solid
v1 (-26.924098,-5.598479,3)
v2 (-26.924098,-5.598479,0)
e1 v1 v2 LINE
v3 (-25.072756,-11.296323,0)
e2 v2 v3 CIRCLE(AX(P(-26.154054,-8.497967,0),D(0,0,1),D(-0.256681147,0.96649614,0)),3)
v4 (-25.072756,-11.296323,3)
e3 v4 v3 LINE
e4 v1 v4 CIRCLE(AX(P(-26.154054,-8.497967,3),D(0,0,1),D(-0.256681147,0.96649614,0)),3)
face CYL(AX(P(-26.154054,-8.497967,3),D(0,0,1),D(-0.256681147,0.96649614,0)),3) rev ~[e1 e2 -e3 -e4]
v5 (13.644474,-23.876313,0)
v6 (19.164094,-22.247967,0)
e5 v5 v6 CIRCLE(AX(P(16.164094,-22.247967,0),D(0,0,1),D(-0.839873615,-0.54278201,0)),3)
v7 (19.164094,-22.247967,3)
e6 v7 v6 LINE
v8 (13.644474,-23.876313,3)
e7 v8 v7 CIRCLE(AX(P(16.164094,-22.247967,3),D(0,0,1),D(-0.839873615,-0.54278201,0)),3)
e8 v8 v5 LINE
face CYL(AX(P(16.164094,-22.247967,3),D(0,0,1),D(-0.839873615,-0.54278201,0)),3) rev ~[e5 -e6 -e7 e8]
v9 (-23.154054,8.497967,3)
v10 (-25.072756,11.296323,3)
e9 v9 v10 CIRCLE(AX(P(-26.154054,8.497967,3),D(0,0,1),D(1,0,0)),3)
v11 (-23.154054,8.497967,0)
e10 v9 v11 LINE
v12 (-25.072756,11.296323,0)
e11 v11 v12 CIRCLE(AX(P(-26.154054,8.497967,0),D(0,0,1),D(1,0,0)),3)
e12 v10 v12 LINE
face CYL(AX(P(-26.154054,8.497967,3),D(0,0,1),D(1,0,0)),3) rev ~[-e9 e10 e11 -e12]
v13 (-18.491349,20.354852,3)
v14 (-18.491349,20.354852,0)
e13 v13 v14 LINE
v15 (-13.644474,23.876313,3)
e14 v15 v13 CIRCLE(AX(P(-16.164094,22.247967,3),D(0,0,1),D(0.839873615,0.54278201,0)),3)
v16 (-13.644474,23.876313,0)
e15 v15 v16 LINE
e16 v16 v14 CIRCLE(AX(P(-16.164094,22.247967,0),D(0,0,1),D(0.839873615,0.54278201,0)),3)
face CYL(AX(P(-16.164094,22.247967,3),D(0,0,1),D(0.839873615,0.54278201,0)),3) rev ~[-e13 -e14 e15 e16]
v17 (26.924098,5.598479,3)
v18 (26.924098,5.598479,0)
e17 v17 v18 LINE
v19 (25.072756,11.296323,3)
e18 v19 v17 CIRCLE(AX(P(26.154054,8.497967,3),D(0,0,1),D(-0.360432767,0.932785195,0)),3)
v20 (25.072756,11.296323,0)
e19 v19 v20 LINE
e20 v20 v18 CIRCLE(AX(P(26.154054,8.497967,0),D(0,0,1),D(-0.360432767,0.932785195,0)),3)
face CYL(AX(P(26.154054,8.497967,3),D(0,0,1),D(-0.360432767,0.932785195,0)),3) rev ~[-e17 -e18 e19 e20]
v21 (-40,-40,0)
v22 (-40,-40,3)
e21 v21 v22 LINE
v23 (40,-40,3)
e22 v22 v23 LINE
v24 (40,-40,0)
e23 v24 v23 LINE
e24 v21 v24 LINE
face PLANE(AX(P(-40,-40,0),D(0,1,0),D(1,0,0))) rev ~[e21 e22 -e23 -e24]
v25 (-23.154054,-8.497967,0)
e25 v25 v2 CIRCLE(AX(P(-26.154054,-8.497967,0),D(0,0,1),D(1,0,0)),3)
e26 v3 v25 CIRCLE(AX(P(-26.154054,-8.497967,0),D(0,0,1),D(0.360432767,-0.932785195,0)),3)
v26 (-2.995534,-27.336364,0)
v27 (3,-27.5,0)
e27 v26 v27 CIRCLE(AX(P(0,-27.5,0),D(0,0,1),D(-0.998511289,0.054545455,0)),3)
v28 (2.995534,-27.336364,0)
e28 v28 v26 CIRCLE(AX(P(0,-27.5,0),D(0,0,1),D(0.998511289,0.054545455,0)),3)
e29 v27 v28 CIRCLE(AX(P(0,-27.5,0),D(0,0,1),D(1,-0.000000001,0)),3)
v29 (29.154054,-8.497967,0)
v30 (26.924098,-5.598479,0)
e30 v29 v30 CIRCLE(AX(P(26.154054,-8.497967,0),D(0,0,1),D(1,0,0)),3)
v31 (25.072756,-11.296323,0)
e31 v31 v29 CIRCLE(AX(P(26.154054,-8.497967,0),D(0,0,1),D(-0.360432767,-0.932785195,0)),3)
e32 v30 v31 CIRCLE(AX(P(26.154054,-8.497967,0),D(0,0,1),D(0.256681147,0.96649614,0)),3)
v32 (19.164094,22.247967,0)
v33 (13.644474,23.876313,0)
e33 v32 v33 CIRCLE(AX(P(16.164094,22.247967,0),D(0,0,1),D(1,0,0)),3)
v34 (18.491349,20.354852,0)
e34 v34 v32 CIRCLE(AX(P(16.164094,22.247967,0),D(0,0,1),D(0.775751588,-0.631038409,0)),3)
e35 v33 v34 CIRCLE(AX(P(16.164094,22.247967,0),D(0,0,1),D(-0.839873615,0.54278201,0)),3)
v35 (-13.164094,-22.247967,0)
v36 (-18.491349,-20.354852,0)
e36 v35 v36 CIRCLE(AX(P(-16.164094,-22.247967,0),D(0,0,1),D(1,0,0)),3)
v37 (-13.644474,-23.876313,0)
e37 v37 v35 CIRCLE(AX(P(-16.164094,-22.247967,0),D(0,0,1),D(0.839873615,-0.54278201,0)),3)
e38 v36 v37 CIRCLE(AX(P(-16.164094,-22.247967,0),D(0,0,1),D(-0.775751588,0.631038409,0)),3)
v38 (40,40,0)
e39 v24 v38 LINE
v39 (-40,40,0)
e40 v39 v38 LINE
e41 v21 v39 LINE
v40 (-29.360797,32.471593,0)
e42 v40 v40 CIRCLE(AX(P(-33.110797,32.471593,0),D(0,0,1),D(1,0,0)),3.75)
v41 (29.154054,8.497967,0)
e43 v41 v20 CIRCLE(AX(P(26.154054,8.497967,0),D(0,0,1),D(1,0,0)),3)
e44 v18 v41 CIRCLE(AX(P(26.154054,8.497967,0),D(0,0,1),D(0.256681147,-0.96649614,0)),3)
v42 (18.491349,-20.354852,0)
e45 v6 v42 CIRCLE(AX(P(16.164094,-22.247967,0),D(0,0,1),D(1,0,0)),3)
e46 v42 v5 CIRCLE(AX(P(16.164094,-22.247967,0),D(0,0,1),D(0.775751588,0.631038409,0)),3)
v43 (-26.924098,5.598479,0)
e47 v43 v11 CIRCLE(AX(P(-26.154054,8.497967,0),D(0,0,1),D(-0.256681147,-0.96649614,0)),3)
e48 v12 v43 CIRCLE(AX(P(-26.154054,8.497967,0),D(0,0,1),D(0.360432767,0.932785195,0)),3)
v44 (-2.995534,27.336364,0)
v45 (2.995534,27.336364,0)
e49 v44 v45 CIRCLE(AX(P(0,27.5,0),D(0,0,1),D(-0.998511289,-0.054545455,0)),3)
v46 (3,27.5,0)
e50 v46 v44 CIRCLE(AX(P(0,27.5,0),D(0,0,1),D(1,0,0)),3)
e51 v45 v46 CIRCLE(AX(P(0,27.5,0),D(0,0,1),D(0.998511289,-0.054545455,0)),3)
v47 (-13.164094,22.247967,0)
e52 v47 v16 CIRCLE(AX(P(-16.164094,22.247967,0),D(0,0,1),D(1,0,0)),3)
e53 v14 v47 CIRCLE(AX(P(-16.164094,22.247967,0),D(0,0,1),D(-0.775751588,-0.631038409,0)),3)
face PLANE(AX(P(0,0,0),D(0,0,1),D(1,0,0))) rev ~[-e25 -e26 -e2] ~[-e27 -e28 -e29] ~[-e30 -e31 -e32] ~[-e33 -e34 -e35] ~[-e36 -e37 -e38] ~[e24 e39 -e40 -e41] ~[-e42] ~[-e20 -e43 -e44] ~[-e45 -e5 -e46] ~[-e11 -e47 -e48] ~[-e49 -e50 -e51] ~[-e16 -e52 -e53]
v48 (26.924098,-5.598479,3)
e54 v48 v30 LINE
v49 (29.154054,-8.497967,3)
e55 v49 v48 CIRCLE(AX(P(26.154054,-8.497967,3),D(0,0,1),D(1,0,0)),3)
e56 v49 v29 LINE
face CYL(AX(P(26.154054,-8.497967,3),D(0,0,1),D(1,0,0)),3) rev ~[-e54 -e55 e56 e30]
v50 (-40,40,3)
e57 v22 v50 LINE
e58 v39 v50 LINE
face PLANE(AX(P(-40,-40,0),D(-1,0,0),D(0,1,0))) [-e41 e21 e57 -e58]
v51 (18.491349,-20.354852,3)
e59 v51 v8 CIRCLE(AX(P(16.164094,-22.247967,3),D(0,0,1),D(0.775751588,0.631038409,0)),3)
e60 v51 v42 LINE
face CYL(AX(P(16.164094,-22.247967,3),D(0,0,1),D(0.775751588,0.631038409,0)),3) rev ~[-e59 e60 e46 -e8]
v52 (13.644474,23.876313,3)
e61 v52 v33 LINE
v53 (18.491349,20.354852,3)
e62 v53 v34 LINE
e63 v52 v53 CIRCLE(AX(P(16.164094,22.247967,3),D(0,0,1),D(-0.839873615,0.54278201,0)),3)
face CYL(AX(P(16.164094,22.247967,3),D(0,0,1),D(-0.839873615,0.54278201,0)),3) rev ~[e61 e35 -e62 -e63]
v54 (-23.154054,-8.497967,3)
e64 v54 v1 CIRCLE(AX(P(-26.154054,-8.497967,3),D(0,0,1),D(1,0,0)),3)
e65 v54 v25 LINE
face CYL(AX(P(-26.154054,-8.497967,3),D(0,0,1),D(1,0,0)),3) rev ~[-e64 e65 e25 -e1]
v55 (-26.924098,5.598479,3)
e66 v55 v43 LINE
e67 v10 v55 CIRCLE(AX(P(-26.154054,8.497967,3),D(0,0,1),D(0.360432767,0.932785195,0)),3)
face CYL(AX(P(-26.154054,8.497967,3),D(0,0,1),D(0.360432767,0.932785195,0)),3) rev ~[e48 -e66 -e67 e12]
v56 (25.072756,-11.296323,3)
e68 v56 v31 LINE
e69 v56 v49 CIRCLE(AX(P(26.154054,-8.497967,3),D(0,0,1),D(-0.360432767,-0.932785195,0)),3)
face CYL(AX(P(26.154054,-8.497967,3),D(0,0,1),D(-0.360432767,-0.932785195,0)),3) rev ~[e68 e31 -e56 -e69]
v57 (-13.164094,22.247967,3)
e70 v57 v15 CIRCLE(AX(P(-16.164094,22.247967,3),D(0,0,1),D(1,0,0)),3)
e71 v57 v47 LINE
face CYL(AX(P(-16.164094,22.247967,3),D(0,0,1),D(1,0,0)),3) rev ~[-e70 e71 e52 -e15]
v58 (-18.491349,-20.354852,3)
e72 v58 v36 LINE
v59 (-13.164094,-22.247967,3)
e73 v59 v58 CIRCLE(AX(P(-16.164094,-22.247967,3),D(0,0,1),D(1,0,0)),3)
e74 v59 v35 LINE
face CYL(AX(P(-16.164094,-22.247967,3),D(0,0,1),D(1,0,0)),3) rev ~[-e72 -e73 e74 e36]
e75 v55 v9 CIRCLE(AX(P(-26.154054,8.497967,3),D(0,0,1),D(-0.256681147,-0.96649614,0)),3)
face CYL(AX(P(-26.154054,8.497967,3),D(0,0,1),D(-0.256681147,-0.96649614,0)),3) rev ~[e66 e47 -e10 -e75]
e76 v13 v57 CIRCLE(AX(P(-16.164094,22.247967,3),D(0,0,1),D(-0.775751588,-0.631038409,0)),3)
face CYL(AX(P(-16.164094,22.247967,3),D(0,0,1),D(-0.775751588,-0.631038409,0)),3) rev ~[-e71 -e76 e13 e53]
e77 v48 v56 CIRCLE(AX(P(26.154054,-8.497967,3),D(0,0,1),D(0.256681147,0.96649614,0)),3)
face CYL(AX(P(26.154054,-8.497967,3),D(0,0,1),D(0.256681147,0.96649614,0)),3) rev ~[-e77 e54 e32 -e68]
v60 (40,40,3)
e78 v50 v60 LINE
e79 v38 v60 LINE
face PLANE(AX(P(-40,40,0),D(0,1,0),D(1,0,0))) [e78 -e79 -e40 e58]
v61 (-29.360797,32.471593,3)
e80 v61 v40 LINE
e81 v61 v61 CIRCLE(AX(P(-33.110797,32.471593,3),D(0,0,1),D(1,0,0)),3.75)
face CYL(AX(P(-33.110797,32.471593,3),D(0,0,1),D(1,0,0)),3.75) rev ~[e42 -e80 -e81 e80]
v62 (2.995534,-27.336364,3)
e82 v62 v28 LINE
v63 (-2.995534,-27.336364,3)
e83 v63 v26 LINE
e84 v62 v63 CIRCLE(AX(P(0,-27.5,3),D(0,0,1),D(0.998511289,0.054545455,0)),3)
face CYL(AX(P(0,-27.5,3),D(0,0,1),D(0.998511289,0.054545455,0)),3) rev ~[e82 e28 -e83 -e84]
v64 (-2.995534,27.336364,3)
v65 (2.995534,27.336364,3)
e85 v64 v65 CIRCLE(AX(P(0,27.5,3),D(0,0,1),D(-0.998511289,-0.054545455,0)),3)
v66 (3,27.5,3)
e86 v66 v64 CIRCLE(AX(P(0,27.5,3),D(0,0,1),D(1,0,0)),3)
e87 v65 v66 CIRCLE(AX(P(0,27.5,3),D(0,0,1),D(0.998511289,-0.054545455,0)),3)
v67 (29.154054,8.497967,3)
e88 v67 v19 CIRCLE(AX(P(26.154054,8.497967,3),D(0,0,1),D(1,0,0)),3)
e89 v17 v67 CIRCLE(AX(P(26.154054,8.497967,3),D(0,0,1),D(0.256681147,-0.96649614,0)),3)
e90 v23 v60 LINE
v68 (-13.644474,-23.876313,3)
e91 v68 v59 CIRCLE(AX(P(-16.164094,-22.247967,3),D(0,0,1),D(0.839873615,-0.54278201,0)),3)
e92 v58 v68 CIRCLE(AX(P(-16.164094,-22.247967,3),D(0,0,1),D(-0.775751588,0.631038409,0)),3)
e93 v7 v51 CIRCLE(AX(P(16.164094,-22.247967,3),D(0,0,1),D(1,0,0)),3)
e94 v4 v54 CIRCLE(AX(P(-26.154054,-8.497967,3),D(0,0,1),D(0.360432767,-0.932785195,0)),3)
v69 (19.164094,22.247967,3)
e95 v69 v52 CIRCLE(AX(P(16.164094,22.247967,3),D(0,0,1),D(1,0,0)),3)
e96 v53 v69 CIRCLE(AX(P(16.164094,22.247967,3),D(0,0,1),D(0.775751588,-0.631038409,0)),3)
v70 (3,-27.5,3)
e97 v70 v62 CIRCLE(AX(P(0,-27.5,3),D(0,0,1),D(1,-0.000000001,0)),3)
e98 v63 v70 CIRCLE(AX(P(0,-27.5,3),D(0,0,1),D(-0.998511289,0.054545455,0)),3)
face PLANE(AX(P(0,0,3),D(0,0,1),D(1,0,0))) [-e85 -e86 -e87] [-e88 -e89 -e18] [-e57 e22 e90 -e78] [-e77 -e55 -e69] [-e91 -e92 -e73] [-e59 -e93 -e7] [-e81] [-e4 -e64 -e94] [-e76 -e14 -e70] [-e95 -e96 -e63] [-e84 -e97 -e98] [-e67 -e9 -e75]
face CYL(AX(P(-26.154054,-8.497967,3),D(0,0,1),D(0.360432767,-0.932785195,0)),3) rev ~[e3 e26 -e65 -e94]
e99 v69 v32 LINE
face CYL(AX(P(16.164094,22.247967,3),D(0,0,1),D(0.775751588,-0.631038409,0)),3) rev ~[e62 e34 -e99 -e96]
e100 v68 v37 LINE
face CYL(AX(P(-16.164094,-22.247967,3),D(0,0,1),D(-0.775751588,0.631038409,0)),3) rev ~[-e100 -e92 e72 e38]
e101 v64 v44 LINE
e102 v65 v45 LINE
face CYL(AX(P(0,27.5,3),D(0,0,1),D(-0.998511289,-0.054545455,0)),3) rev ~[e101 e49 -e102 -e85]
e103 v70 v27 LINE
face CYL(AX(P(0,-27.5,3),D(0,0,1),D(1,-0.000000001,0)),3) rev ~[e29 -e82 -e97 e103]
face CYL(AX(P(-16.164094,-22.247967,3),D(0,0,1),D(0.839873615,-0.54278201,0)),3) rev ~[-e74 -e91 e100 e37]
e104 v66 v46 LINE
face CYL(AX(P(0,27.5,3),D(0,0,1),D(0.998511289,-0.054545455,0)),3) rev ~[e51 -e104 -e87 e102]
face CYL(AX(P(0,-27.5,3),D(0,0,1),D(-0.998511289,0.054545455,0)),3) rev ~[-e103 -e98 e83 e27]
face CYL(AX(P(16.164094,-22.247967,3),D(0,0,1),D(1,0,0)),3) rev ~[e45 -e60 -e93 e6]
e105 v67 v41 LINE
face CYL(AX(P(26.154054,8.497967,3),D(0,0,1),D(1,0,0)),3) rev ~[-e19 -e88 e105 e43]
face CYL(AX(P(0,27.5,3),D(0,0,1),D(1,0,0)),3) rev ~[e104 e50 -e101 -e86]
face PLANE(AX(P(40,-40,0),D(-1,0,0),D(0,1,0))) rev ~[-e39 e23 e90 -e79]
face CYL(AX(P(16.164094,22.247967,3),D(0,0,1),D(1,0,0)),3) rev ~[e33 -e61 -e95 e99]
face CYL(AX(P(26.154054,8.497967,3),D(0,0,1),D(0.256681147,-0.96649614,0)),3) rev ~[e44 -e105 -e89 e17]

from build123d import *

# Parameters (mm, degrees)
F0_W     = 80
F0_H     = 80
F1_DEPTH = 3
F3_DEPTH = 25
F4_R     = 3.75
F5_DEPTH = 25


with BuildPart() as f1:
    # F0 (on Top) → F1 (new body)
    with BuildSketch(Plane.XY):
        Rectangle(F0_W, F0_H)
    extrude(amount=F1_DEPTH)

    # F2 (on face) → F3 (cut)
    with BuildSketch(Plane.XY.offset(3)):
        with BuildLine():
            ThreePointArc((25.0727558965, 11.2963229308), (23.3008846492, 7.5709163622), (26.9240976399, 5.5984789253))
            ThreePointArc((26.9240976399, 5.5984789253), (26.1540541981, 8.4979673453), (25.0727558965, 11.2963229308))
        make_face()
        with BuildLine():
            ThreePointArc((25.0727558965, 11.2963229308), (26.1540541981, 8.4979673453), (26.9240976399, 5.5984789253))
            ThreePointArc((26.9240976399, 5.5984789253), (28.5320922892, 6.669051044), (29.1540541981, 8.4979673453))
            ThreePointArc((29.1540541981, 8.4979673453), (27.8505366022, 10.9722242949), (25.0727558965, 11.2963229308))
        make_face()
        with BuildLine():
            ThreePointArc((29.1540541981, -8.4979673453), (28.5320922892, -6.669051044), (26.9240976399, -5.5984789253))
            ThreePointArc((26.9240976399, -5.5984789253), (26.1540541981, -8.4979673453), (25.0727558965, -11.2963229308))
            ThreePointArc((25.0727558965, -11.2963229308), (27.8505366022, -10.9722242949), (29.1540541981, -8.4979673453))
        make_face()
        with BuildLine():
            ThreePointArc((25.0727558965, -11.2963229308), (26.1540541981, -8.4979673453), (26.9240976399, -5.5984789253))
            ThreePointArc((26.9240976399, -5.5984789253), (23.3008846492, -7.5709163622), (25.0727558965, -11.2963229308))
        make_face()
        with BuildLine():
            ThreePointArc((13.6444735922, 23.8763133752), (14.4007386812, 19.8209163622), (18.4913492013, 20.3548521172))
            ThreePointArc((18.4913492013, 20.3548521172), (16.164094438, 22.2479673453), (13.6444735922, 23.8763133752))
        make_face()
        with BuildLine():
            ThreePointArc((13.6444735922, 23.8763133752), (16.164094438, 22.2479673453), (18.4913492013, 20.3548521172))
            ThreePointArc((18.4913492013, 20.3548521172), (18.990909279, 21.2434187626), (19.164094438, 22.2479673453))
            ThreePointArc((19.164094438, 22.2479673453), (17.0129576374, 25.1253674337), (13.6444735922, 23.8763133752))
        make_face()
        with BuildLine():
            ThreePointArc((19.164094438, -22.2479673453), (18.990909279, -21.2434187626), (18.4913492013, -20.3548521172))
            ThreePointArc((18.4913492013, -20.3548521172), (16.164094438, -22.2479673453), (13.6444735922, -23.8763133752))
            ThreePointArc((13.6444735922, -23.8763133752), (17.0129576374, -25.1253674337), (19.164094438, -22.2479673453))
        make_face()
        with BuildLine():
            ThreePointArc((13.6444735922, -23.8763133752), (16.164094438, -22.2479673453), (18.4913492013, -20.3548521172))
            ThreePointArc((18.4913492013, -20.3548521172), (14.4007386812, -19.8209163622), (13.6444735922, -23.8763133752))
        make_face()
        with BuildLine():
            ThreePointArc((-2.9955338657, 27.3363636364), (0, 24.5), (2.9955338657, 27.3363636364))
            ThreePointArc((2.9955338657, 27.3363636364), (0, 27.5), (-2.9955338657, 27.3363636364))
        make_face()
        with BuildLine():
            ThreePointArc((-2.9955338657, 27.3363636364), (0, 27.5), (2.9955338657, 27.3363636364))
            ThreePointArc((2.9955338657, 27.3363636364), (2.9988832586, 27.4181513503), (3, 27.5))
            ThreePointArc((3, 27.5), (-0.0818486497, 30.4988832586), (-2.9955338657, 27.3363636364))
        make_face()
        with BuildLine():
            ThreePointArc((3, -27.5), (2.9988832586, -27.4181513503), (2.9955338657, -27.3363636364))
            ThreePointArc((2.9955338657, -27.3363636364), (0, -27.5), (-2.9955338657, -27.3363636364))
            ThreePointArc((-2.9955338657, -27.3363636364), (-0.0818486497, -30.4988832586), (3, -27.5))
        make_face()
        with BuildLine():
            ThreePointArc((-2.9955338657, -27.3363636364), (0, -27.5), (2.9955338657, -27.3363636364))
            ThreePointArc((2.9955338657, -27.3363636364), (0, -24.5), (-2.9955338657, -27.3363636364))
        make_face()
        with BuildLine():
            ThreePointArc((-13.164094438, 22.2479673453), (-13.2866943496, 23.0968305447), (-13.6444735922, 23.8763133752))
            ThreePointArc((-13.6444735922, 23.8763133752), (-16.164094438, 22.2479673453), (-18.4913492013, 20.3548521172))
            ThreePointArc((-18.4913492013, 20.3548521172), (-15.1595458553, 19.4211525044), (-13.164094438, 22.2479673453))
        make_face()
        with BuildLine():
            ThreePointArc((-18.4913492013, 20.3548521172), (-16.164094438, 22.2479673453), (-13.6444735922, 23.8763133752))
            ThreePointArc((-13.6444735922, 23.8763133752), (-17.9274501949, 24.6750183284), (-18.4913492013, 20.3548521172))
        make_face()
        with BuildLine():
            ThreePointArc((-18.4913492013, -20.3548521172), (-17.9274501949, -24.6750183284), (-13.6444735922, -23.8763133752))
            ThreePointArc((-13.6444735922, -23.8763133752), (-16.164094438, -22.2479673453), (-18.4913492013, -20.3548521172))
        make_face()
        with BuildLine():
            ThreePointArc((-18.4913492013, -20.3548521172), (-16.164094438, -22.2479673453), (-13.6444735922, -23.8763133752))
            ThreePointArc((-13.6444735922, -23.8763133752), (-13.2866943496, -23.0968305447), (-13.164094438, -22.2479673453))
            ThreePointArc((-13.164094438, -22.2479673453), (-15.1595458553, -19.4211525044), (-18.4913492013, -20.3548521172))
        make_face()
        with BuildLine():
            ThreePointArc((-23.1540541981, 8.4979673453), (-23.6797972485, 10.1944497494), (-25.0727558965, 11.2963229308))
            ThreePointArc((-25.0727558965, 11.2963229308), (-26.1540541981, 8.4979673453), (-26.9240976399, 5.5984789253))
            ThreePointArc((-26.9240976399, 5.5984789253), (-24.3251378968, 6.1199292542), (-23.1540541981, 8.4979673453))
        make_face()
        with BuildLine():
            ThreePointArc((-26.9240976399, 5.5984789253), (-26.1540541981, 8.4979673453), (-25.0727558965, 11.2963229308))
            ThreePointArc((-25.0727558965, 11.2963229308), (-29.007223747, 9.4250183284), (-26.9240976399, 5.5984789253))
        make_face()
        with BuildLine():
            ThreePointArc((-26.9240976399, -5.5984789253), (-29.007223747, -9.4250183284), (-25.0727558965, -11.2963229308))
            ThreePointArc((-25.0727558965, -11.2963229308), (-26.1540541981, -8.4979673453), (-26.9240976399, -5.5984789253))
        make_face()
        with BuildLine():
            ThreePointArc((-26.9240976399, -5.5984789253), (-26.1540541981, -8.4979673453), (-25.0727558965, -11.2963229308))
            ThreePointArc((-25.0727558965, -11.2963229308), (-23.6797972485, -10.1944497494), (-23.1540541981, -8.4979673453))
            ThreePointArc((-23.1540541981, -8.4979673453), (-24.3251378968, -6.1199292542), (-26.9240976399, -5.5984789253))
        make_face()
    extrude(amount=-F3_DEPTH, mode=Mode.SUBTRACT)

    # F4 (on face) → F5 (cut)
    with BuildSketch(Plane.XY.offset(3)):
        with Locations((-33.1107974052, 32.4715934694)):
            Circle(F4_R)
    extrude(amount=-F5_DEPTH, mode=Mode.SUBTRACT)


solid = f1.part
